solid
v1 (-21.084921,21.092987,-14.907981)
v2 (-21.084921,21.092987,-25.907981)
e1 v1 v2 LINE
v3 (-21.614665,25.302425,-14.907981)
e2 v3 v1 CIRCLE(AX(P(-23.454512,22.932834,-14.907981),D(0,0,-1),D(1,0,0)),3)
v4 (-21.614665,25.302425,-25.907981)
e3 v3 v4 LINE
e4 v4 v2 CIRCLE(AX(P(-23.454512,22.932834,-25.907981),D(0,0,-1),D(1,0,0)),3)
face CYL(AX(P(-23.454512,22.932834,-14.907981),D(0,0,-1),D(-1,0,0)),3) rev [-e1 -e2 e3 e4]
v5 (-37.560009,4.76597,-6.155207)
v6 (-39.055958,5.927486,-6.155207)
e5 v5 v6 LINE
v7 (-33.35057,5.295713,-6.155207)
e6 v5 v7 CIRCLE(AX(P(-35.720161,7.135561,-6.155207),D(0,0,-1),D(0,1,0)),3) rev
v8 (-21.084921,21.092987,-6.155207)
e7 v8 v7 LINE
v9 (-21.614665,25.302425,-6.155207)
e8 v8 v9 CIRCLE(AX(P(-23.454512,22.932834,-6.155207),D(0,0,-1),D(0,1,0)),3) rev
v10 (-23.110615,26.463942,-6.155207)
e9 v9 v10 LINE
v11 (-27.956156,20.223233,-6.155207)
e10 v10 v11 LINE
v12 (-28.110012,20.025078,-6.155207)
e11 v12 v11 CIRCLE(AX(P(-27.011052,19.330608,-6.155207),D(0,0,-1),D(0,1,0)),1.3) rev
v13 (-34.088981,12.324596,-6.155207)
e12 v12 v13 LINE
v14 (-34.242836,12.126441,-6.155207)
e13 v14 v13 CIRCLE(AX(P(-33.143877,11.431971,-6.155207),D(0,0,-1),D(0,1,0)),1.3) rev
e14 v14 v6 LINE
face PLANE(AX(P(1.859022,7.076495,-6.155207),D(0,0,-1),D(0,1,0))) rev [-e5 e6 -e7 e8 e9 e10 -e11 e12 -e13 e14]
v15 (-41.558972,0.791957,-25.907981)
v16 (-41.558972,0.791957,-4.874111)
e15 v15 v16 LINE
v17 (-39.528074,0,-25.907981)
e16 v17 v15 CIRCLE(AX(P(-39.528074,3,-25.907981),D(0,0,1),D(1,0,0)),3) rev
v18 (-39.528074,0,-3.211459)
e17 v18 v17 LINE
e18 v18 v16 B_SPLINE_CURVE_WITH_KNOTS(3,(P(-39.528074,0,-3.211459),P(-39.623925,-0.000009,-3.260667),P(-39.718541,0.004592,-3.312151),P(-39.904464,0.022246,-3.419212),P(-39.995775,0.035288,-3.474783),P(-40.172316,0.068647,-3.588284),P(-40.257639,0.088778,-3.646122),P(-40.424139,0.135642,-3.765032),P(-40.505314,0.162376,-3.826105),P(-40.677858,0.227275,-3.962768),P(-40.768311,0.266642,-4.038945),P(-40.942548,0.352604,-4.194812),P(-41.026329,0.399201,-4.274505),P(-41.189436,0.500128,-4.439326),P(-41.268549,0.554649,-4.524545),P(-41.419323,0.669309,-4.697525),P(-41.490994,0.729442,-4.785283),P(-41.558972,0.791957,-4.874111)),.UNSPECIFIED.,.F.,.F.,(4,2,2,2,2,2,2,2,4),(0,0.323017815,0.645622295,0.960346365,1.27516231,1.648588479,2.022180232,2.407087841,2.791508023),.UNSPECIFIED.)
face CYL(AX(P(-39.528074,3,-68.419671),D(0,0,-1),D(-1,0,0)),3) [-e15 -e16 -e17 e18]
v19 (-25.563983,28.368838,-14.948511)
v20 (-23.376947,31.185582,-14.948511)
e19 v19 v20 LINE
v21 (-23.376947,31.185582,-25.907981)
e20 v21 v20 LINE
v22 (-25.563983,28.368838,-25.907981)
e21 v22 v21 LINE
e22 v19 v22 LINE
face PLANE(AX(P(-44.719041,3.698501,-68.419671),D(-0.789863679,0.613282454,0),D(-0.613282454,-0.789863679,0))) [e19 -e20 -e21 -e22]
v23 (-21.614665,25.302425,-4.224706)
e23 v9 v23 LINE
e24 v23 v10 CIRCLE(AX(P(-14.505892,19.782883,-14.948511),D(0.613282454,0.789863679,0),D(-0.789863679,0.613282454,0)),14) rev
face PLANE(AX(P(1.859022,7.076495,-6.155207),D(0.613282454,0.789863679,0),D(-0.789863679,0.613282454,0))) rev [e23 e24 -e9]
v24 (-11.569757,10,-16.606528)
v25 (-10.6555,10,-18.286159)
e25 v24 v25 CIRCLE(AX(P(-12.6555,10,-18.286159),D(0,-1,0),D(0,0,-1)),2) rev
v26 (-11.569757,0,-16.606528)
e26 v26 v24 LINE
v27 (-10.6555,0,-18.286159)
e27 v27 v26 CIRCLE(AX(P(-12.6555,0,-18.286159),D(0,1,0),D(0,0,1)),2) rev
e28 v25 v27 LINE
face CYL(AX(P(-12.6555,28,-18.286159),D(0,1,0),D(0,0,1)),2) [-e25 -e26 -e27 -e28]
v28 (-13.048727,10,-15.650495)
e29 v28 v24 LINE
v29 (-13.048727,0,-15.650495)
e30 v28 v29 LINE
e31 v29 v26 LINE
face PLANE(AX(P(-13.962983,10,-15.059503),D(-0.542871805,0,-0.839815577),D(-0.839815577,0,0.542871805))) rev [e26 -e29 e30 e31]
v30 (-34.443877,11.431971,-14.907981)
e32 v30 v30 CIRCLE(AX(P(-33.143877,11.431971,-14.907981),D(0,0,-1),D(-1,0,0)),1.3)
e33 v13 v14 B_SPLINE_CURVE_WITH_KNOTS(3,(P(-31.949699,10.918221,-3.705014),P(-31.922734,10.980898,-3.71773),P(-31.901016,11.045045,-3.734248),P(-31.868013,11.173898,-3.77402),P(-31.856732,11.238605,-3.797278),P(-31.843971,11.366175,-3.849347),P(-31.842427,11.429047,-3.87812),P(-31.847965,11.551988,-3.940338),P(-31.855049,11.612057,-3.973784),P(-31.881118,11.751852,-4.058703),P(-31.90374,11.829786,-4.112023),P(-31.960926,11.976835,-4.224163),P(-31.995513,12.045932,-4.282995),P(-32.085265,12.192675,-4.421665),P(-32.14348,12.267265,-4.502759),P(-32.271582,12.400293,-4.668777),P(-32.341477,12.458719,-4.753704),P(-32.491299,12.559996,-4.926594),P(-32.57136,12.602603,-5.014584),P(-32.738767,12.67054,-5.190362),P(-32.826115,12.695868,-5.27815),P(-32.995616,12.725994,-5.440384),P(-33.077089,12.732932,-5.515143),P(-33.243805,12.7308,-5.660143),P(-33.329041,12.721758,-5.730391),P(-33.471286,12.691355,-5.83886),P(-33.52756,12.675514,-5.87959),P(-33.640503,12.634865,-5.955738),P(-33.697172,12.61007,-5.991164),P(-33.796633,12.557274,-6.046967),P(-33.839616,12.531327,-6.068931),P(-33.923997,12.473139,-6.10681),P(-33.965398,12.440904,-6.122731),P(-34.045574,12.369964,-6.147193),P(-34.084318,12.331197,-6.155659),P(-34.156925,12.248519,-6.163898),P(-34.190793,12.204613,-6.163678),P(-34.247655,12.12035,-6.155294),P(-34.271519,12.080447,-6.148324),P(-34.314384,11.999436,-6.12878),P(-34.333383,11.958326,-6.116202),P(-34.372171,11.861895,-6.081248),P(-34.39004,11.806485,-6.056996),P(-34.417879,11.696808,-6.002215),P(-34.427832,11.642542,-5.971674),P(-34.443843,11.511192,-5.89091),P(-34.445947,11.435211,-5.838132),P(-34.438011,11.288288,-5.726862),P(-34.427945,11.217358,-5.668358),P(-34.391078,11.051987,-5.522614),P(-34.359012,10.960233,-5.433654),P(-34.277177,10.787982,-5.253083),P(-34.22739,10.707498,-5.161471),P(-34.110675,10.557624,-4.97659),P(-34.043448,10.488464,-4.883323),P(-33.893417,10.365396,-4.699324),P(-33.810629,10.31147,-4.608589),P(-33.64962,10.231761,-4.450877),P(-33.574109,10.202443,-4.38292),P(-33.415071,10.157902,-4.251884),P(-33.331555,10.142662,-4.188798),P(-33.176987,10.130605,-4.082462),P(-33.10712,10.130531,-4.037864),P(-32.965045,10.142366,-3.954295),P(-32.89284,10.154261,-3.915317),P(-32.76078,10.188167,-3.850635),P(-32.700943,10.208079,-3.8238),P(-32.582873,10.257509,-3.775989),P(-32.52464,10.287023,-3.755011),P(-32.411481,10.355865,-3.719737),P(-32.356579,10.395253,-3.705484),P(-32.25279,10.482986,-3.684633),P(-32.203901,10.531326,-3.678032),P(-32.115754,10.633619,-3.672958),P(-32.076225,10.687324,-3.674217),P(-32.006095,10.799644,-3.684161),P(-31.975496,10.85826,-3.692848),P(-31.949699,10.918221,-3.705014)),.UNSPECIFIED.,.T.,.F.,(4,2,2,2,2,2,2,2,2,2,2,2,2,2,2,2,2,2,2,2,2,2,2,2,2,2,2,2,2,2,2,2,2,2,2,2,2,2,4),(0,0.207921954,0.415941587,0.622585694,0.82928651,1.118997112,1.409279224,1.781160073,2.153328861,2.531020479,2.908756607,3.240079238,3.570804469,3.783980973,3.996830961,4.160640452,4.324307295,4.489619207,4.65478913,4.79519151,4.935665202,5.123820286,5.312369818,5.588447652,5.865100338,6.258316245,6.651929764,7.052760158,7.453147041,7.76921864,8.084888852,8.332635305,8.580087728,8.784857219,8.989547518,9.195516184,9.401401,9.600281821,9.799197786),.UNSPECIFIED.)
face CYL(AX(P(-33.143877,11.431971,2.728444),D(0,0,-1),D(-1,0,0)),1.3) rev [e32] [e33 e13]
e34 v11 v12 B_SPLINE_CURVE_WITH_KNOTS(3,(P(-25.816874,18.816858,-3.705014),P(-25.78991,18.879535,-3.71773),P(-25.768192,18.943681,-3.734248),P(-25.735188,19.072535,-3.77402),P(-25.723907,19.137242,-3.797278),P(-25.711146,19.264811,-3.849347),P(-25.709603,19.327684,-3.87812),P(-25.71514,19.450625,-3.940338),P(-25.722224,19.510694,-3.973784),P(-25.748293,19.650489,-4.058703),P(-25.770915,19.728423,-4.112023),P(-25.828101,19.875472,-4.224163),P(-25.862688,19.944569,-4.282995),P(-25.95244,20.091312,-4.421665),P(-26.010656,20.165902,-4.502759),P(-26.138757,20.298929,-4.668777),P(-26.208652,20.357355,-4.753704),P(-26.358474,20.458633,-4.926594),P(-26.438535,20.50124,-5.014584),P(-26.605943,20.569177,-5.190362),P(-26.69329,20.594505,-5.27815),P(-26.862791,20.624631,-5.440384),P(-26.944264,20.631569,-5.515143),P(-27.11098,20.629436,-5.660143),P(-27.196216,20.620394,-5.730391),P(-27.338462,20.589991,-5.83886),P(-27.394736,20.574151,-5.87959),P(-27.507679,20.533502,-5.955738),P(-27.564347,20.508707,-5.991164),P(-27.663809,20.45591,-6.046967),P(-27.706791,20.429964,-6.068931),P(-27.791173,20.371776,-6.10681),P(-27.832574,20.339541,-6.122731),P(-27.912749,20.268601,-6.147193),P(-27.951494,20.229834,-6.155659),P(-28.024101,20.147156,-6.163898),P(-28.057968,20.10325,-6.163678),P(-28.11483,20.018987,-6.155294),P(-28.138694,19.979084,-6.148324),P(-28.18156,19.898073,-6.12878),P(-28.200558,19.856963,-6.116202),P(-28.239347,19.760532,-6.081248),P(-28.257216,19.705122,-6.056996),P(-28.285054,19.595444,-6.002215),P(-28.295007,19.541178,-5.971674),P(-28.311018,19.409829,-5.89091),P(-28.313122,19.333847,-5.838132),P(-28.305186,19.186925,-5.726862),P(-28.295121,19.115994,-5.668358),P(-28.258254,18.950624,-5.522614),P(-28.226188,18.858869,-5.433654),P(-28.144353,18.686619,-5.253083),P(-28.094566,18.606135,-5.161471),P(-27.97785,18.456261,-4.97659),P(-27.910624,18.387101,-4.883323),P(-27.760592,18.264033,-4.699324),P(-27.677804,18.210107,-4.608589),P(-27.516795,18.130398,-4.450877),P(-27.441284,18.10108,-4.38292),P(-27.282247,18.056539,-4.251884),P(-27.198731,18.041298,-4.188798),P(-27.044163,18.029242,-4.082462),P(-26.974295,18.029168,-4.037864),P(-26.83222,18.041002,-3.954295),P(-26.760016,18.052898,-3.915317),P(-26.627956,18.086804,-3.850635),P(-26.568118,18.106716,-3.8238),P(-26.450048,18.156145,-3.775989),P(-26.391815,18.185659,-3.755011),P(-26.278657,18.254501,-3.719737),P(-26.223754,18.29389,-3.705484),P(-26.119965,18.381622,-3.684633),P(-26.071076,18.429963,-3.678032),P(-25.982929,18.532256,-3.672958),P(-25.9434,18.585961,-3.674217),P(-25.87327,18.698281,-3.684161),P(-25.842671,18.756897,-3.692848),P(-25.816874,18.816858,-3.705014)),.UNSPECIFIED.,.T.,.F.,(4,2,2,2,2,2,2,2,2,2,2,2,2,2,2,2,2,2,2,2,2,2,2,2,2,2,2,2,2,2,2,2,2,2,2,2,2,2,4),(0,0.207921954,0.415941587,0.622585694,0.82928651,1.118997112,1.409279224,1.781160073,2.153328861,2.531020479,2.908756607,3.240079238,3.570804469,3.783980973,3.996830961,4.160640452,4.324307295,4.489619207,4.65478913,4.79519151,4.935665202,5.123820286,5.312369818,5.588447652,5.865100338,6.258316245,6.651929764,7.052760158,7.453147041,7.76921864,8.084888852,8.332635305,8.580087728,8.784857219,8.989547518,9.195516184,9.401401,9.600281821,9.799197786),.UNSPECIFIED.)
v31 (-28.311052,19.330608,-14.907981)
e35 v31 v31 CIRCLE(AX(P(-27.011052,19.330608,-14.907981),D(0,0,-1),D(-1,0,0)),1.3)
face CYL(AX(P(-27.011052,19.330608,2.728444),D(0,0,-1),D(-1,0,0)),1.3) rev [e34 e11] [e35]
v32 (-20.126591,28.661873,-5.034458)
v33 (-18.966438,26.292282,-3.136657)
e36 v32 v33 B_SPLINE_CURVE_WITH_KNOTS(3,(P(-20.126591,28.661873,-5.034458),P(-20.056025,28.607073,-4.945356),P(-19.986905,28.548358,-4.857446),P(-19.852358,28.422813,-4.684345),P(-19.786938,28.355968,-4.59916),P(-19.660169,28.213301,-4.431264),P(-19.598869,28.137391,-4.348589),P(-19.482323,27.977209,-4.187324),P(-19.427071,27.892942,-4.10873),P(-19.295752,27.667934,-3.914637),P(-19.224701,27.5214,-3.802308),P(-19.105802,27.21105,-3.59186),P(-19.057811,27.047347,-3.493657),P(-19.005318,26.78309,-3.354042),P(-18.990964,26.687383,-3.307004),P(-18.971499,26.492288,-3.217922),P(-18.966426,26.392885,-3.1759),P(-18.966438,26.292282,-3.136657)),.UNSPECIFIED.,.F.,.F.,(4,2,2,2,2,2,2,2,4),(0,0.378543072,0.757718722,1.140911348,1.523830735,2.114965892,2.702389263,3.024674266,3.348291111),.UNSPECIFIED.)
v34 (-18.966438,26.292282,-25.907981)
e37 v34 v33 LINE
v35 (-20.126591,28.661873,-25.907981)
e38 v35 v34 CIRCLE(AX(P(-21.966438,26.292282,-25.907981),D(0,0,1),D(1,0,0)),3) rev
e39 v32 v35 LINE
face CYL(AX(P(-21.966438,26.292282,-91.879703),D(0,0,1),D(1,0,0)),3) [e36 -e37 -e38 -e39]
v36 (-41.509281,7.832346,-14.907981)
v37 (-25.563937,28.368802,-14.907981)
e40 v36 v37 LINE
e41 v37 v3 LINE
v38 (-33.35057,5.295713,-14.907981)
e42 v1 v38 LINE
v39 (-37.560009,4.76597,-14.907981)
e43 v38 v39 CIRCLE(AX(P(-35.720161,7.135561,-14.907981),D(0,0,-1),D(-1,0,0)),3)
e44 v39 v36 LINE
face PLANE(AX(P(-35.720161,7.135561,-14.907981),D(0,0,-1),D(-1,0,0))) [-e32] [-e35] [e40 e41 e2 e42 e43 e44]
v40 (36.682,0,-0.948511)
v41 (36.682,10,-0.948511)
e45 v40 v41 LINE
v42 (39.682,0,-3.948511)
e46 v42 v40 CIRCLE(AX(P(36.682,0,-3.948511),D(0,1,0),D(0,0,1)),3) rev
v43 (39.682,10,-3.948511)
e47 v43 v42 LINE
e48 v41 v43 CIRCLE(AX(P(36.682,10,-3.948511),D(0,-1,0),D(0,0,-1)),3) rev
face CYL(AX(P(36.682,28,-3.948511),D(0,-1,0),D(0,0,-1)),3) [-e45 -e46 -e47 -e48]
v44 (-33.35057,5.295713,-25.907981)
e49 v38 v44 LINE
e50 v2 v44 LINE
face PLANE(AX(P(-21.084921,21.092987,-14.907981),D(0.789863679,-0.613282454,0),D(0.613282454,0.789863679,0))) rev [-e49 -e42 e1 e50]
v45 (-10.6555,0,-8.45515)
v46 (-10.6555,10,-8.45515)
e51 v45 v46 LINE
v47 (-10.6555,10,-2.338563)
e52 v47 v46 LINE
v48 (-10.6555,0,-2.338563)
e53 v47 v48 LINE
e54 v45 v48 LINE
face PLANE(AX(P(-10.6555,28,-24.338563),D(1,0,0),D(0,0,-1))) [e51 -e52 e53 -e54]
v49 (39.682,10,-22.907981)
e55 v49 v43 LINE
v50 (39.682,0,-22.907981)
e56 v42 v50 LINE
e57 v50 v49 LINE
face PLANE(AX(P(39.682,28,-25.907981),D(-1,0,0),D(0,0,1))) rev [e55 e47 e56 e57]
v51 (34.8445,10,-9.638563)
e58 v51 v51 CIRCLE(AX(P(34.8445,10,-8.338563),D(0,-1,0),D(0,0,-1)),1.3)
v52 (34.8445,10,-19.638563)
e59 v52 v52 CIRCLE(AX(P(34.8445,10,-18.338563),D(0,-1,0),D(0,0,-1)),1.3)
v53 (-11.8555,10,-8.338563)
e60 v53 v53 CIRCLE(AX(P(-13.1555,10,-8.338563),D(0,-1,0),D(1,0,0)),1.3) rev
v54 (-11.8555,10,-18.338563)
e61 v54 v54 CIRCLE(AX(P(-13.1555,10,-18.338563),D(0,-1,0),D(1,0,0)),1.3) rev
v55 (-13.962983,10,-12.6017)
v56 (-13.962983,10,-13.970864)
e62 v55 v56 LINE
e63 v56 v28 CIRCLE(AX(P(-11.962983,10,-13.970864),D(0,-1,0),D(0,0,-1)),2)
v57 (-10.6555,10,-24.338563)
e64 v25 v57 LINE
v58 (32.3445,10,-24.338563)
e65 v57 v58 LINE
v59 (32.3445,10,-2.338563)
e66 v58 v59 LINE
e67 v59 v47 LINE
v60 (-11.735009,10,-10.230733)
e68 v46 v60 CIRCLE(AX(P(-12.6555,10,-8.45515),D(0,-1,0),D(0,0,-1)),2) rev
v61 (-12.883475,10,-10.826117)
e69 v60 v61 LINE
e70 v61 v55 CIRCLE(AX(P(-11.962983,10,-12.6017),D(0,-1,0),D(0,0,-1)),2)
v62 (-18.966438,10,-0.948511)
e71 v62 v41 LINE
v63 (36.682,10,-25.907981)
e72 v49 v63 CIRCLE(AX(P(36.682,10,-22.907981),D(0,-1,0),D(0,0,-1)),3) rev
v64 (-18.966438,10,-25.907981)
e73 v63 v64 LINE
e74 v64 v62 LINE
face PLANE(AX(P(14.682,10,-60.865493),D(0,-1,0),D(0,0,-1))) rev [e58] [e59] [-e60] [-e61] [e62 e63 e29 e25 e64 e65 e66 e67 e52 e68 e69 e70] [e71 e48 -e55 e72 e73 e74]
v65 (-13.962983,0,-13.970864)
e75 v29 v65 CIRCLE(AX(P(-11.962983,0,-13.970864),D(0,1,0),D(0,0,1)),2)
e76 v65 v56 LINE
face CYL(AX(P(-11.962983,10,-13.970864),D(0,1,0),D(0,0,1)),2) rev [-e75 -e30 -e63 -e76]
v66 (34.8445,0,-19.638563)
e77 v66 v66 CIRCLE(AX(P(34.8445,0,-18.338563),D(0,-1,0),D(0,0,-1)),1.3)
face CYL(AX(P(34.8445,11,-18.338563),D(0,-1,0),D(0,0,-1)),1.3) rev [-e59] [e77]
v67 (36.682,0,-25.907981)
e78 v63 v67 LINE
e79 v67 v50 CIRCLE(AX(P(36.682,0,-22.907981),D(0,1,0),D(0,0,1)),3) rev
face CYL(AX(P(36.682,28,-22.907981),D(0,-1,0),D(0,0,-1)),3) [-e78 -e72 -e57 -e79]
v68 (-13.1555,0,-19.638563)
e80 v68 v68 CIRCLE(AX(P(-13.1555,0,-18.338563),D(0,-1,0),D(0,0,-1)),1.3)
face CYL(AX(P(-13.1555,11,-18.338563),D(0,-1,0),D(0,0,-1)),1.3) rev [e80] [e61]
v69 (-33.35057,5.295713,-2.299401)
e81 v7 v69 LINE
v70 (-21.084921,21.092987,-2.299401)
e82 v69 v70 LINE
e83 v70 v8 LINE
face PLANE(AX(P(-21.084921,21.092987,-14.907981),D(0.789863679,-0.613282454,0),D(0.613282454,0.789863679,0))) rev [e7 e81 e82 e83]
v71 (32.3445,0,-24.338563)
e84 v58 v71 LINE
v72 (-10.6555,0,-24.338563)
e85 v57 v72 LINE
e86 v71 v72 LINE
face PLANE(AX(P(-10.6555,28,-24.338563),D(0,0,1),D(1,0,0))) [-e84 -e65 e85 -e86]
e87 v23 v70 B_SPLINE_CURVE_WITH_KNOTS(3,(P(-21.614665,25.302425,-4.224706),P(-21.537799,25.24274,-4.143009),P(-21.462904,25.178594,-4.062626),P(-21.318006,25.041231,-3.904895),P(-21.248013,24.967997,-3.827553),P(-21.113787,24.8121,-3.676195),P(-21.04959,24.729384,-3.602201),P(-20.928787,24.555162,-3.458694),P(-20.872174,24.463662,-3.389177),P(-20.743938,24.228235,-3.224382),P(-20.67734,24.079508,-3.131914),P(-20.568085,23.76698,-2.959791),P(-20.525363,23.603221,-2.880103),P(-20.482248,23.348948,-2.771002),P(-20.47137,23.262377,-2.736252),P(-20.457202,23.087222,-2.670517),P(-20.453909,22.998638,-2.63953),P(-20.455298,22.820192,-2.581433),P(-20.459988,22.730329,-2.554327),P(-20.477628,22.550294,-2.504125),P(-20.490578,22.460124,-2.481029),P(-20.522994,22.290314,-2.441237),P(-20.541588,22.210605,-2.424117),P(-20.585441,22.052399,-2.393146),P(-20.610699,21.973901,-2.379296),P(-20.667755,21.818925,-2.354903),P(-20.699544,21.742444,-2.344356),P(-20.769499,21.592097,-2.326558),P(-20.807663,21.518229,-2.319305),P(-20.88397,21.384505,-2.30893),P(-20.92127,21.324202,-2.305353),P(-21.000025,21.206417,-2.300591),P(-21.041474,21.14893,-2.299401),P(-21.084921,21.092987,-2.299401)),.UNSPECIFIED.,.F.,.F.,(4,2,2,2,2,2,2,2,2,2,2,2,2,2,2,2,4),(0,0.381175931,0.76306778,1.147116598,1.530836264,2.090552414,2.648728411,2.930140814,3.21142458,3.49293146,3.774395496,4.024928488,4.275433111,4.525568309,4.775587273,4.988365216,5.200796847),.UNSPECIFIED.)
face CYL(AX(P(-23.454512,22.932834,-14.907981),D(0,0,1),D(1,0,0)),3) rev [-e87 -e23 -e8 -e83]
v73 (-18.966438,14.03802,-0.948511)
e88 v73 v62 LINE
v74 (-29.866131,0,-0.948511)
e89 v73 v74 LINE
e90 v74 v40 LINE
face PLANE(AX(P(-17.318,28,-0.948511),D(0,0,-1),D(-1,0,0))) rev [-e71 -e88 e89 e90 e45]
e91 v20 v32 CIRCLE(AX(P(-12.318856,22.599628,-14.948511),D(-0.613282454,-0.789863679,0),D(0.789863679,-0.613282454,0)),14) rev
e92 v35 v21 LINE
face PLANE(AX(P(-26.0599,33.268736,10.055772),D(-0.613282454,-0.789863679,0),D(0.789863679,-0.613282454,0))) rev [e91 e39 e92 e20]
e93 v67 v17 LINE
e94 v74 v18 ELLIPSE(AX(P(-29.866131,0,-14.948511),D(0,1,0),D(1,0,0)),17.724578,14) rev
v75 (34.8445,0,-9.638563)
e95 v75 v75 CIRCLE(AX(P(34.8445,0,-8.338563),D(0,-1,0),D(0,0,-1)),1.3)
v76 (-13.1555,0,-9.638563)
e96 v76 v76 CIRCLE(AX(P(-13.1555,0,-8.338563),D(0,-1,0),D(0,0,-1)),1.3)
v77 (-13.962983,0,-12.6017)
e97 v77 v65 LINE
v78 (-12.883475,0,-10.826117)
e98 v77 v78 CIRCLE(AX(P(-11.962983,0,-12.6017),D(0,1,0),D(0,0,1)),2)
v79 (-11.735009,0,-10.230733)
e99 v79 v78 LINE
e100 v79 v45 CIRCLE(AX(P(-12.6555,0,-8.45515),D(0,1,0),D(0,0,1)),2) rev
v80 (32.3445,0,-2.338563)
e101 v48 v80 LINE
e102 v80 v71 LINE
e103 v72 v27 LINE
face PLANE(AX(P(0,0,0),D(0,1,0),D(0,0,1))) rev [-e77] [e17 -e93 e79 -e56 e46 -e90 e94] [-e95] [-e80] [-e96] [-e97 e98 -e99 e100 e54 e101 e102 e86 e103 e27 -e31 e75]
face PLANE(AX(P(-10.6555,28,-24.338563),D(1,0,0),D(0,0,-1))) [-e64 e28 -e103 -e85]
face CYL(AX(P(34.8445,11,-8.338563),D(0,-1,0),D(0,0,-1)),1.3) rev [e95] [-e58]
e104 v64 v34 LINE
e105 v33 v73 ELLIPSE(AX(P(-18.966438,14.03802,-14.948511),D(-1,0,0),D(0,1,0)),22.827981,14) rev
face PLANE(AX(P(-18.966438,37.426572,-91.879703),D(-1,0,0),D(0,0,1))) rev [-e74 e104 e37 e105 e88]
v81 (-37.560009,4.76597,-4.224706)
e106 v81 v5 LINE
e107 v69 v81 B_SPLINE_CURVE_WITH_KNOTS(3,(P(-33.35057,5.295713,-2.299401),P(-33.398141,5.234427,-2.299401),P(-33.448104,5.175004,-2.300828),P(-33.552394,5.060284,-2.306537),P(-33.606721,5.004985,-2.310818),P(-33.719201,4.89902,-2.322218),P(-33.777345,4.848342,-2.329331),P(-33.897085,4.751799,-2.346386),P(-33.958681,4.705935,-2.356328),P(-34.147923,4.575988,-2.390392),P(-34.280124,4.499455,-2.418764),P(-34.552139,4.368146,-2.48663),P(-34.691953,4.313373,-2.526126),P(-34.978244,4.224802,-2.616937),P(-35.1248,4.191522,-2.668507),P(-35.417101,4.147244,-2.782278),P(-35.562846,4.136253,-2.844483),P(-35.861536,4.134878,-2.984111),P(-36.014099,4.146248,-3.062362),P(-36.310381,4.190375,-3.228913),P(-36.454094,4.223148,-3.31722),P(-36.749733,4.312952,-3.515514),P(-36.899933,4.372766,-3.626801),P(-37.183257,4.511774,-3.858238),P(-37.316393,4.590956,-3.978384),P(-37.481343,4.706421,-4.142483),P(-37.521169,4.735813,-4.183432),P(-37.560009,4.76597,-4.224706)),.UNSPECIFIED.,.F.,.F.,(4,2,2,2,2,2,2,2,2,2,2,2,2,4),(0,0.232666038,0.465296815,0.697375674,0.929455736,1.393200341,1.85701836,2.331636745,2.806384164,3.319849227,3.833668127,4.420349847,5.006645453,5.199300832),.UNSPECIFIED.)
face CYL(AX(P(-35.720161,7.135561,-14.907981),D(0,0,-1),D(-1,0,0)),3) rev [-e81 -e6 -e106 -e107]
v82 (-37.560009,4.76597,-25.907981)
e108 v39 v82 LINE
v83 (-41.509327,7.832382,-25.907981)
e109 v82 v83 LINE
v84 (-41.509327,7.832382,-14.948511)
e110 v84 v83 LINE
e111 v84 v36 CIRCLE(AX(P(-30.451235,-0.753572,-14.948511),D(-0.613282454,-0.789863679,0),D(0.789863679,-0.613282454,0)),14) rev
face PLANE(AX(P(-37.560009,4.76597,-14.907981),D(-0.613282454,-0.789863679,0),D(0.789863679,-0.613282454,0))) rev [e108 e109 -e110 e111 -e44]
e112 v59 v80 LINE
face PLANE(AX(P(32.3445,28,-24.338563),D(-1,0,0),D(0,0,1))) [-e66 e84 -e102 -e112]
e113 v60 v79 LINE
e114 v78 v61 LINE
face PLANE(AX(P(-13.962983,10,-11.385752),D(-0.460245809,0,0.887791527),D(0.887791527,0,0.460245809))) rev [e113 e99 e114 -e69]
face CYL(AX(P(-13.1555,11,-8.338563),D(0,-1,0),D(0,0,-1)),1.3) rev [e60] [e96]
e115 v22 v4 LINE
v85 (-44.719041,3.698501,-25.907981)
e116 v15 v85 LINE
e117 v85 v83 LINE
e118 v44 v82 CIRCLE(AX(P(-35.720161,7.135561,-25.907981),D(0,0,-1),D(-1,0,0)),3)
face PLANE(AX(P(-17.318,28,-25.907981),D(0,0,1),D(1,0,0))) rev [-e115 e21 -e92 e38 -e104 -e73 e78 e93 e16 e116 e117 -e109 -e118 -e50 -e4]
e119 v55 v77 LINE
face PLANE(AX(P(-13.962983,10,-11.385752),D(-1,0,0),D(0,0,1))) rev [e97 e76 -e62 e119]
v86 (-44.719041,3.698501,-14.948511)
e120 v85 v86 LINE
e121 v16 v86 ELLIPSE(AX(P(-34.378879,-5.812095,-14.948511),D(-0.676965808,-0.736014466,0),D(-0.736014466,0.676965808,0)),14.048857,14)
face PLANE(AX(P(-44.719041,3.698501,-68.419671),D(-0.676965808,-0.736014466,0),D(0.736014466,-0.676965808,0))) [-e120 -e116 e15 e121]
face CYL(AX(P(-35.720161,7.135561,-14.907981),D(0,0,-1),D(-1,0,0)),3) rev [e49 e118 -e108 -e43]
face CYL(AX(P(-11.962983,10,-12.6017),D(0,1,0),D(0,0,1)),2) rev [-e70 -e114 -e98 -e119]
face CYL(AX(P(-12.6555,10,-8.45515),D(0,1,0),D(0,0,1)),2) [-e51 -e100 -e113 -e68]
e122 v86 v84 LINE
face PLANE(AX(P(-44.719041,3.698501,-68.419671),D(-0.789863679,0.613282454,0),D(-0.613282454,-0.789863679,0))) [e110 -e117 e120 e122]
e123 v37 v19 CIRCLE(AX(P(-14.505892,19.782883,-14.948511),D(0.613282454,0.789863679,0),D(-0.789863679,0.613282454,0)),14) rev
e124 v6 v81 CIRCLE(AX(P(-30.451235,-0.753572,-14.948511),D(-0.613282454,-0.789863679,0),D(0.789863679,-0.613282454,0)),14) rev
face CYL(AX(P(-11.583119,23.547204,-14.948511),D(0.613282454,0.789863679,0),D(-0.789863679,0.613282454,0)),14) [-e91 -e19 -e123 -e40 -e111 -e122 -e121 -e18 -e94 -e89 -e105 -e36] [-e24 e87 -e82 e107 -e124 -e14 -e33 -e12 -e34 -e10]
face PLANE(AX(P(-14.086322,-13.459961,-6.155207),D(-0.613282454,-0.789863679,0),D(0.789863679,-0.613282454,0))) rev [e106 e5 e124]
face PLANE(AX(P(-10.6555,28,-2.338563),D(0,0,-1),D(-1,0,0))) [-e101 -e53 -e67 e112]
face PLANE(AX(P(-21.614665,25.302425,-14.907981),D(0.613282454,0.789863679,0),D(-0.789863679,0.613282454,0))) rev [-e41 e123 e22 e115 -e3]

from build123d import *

# Parameters (mm, degrees)
CROQUIS1_W                        = 57
CROQUIS1_H                        = 24.959470006
CROQUIS1_W_2                      = 43
CROQUIS1_H_2                      = 22
MAIN_DEPTH                        = 28
CORTE_CAJA_REACH                  = 56.604
CROQUIS2_W                        = 27.955905163
CROQUIS2_H                        = 20.987971864
CROQUIS3_W                        = 32
CROQUIS3_H                        = 24.959470006
SALIENTE_EXTRUIR2_DEPTH           = 2.25
REDONDEO_LATERALES_R              = 3
CROQUIS7_R                        = 1.3
TALADROS_BASE_DEPTH               = 11
CAJEADO_CABLE_DEPTH               = 10
CAJEADO_REDONDEO_R                = 2
SOPORTE_EN_ANGULO_DEPTH           = 24.959470007
CAJA_PARA_SOPORTE_DEPTH           = 11
CROQUIS12_R                       = 1.3
TALADROS_CAJA_SOPORTE_DEPTH       = 13.959470007
CROQUIS15_W                       = 60.00042655
CROQUIS15_H                       = 27.426571923
RECORTE_CAJA_DEPTH                = 24.959470007
CHAFLAN_SUPERIOR_SOPORTE_DEPTH    = 24.959470007
REDONDEO_ARISTAS_SOPORTE_R        = 3
REDONDEO_SOPORTE_R                = 14
CROQUIS17_W                       = 6.155207263
CROQUIS17_H                       = 26
CAJA_TORNILLOS_SOPORTE_DEPTH      = 8
REDONDEO_CAJA_TORNILLOS_SOPORTE_R = 3


with BuildPart() as part:
    # Croquis1 → Main (new body)
    with BuildSketch(Plane(origin=(0, 0, 0), x_dir=(1, 0, 0), z_dir=(0, 1, 0))):
        with Locations((11.181999645, 13.428246359)):
            Rectangle(CROQUIS1_W, CROQUIS1_H)
        with Locations((10.844499645, 13.338562849)):
            Rectangle(CROQUIS1_W_2, CROQUIS1_H_2, mode=Mode.SUBTRACT)
    extrude(amount=MAIN_DEPTH)

    # Corte Caja: up to this face of the body (flat: up to its plane)
    corte_caja_end = Plane(part.part.faces().sort_by_distance((11.181999645, 14, -25.907981362))[0])
    # Croquis2 → Corte Caja (cut, up to the picked face)
    with BuildSketch(Plane.XY.offset(-0.948511356), mode=Mode.PRIVATE) as corte_caja_sk1:
        with Locations((28.659952227, 20.493985932)):
            Rectangle(CROQUIS2_W, CROQUIS2_H)
    corte_caja_tool1 = split(extrude(corte_caja_sk1.sketch, amount=-CORTE_CAJA_REACH, mode=Mode.PRIVATE), bisect_by=corte_caja_end, keep=Keep.BOTH, mode=Mode.PRIVATE)
    add(corte_caja_tool1.solids().sort_by(Axis((28.659952, 20.493986, -0.948511), (0, 0, -1)))[0], mode=Mode.SUBTRACT)

    # Croquis3 → Saliente-Extruir2 (add)
    with BuildSketch(Plane(origin=(0, 28, 0), x_dir=(1, 0, 0), z_dir=(0, 1, 0))):
        with Locations((-1.318000355, 13.428246359)):
            Rectangle(CROQUIS3_W, CROQUIS3_H)
    extrude(amount=SALIENTE_EXTRUIR2_DEPTH)

    # Redondeo Laterales
    redondeo_laterales_edges = [part.edges().sort_by_distance(p)[0] for p in [
        (39.681999645, 5, -25.907981362),
        (39.681999645, 5, -0.948511356),
    ]]
    fillet(redondeo_laterales_edges, radius=REDONDEO_LATERALES_R)

    # Croquis7 → Taladros Base (cut)
    with BuildSketch(Plane.XZ):
        with Locations(Location((-13.155500355, -8.338562849, 0), (0, 0, 270))):
            Circle(CROQUIS7_R)
        with Locations(Location((-13.155500355, -18.338562849, 0), (0, 0, 270))):
            Circle(CROQUIS7_R)
        with Locations(Location((34.844499645, -8.338562849, 0), (0, 0, 270))):
            Circle(CROQUIS7_R)
        with Locations(Location((34.844499645, -18.338562849, 0), (0, 0, 270))):
            Circle(CROQUIS7_R)
    extrude(amount=-TALADROS_BASE_DEPTH, mode=Mode.SUBTRACT)

    # Croquis8 → Cajeado cable (cut)
    with BuildSketch(Plane.XZ):
        Polygon((-10.655500355, -17.197519433), (-10.655500355, -9.671098091), (-13.962983419, -11.385752006), (-13.962983419, -15.059503242), align=None)
    extrude(amount=-CAJEADO_CABLE_DEPTH, mode=Mode.SUBTRACT)

    # Cajeado Redondeo
    cajeado_redondeo_edges = [part.edges().sort_by_distance(p)[0] for p in [
        (-13.962983419, 5, -11.385752006),
        (-10.655500355, 5, -9.671098091),
        (-10.655500355, 5, -17.197519433),
        (-13.962983419, 5, -15.059503242),
    ]]
    fillet(cajeado_redondeo_edges, radius=CAJEADO_REDONDEO_R)

    # Croquis10 → Soporte en angulo (add)
    with BuildSketch(Plane.XY.offset(-0.948511356)):
        Polygon((-17.318000355, 30.25), (-17.318000355, 0), (-40.697936457, 0), (-44.719041018, 3.698501078), (-22.354269001, 32.502718411), (-18.018493057, 32.502718411), align=None)
    extrude(amount=-SOPORTE_EN_ANGULO_DEPTH)

    # Croquis11 → Caja para soporte (cut)
    with BuildSketch(Plane(origin=(0, 0, -25.907981362), x_dir=(-1, 0, 0), z_dir=(0, 0, -1))):
        with BuildLine():
            Line((41.509326916, 7.83238192), (25.563983103, 28.36883757))
            Line((25.563983103, 28.36883757), (21.614664709, 25.302425298))
            ThreePointArc((21.614664709, 25.302425298), (20.477989634, 23.307419605), (21.084921035, 21.092986898))
            Line((21.084921035, 21.092986898), (33.350570122, 5.295713321))
            ThreePointArc((33.350570122, 5.295713321), (35.345575815, 4.159038247), (37.560008522, 4.765969648))
            Line((37.560008522, 4.765969648), (41.509326916, 7.83238192))
        make_face()
    extrude(amount=-CAJA_PARA_SOPORTE_DEPTH, mode=Mode.SUBTRACT)

    # Croquis12 → Taladros caja soporte (cut)
    with BuildSketch(Plane(origin=(0, 0, -14.907981362), x_dir=(-1, 0, 0), z_dir=(0, 0, -1))):
        with Locations((27.011052418, 19.330608197)):
            Circle(CROQUIS12_R)
        with Locations((33.143876962, 11.431971409)):
            Circle(CROQUIS12_R)
    extrude(amount=-TALADROS_CAJA_SOPORTE_DEPTH, mode=Mode.SUBTRACT)

    # Croquis15 → Recorte Caja (cut)
    with BuildSketch(Plane.XY.offset(-0.948511356)):
        with Locations((11.033774869, 23.713285962)):
            Rectangle(CROQUIS15_W, CROQUIS15_H)
    extrude(amount=-RECORTE_CAJA_DEPTH, mode=Mode.SUBTRACT)

    # Croquis16 → Chaflan superior soporte (cut)
    with BuildSketch(Plane(origin=(0, 0, -25.907981362), x_dir=(-1, 0, 0), z_dir=(0, 0, -1))):
        Polygon((26.059899943, 33.268736427), (17.368016439, 26.520002701), (17.368016439, 33.268736427), align=None)
    extrude(amount=-CHAFLAN_SUPERIOR_SOPORTE_DEPTH, mode=Mode.SUBTRACT)

    # Redondeo aristas soporte
    redondeo_aristas_soporte_edges = [part.edges().sort_by_distance(p)[0] for p in [
        (-40.697936457, 0, -13.428246359),
        (-18.966438406, 27.761082869, -13.428246359),
    ]]
    fillet(redondeo_aristas_soporte_edges, radius=REDONDEO_ARISTAS_SOPORTE_R)

    # Redondeo soporte
    # the kernel refuses this fillet: 14 mm, written as the material it takes off along each edge
    with BuildSketch(Plane(origin=(-66.183926921, -23.946727682, -0.948511356), x_dir=(0.7898636788540391, -0.6132824543610909, 0), z_dir=(0.6132824543610909, 0.7898636788540392, 0))) as redondeo_soporte_piece_1:
        with BuildLine():
            CenterArc((REDONDEO_SOPORTE_R, REDONDEO_SOPORTE_R), REDONDEO_SOPORTE_R, 180, 90)
            Line((0, REDONDEO_SOPORTE_R), (0, 0))
            Line((0, 0), (REDONDEO_SOPORTE_R, 0))
        make_face()
    extrude(amount=104.799778712, mode=Mode.SUBTRACT)

    # Croquis17 → Caja tornillos soporte (cut)
    with BuildSketch(Plane(origin=(-29.691111601, 23.053392988, 0), x_dir=(0, 0, 1), z_dir=(-0.789863678854039, 0.6132824543610911, 0))):
        with Locations((-3.077603632, -6.270427893)):
            Rectangle(CROQUIS17_W, CROQUIS17_H)
    extrude(amount=-CAJA_TORNILLOS_SOPORTE_DEPTH, mode=Mode.SUBTRACT)

    # redondeo Caja tornillos soporte
    redondeo_caja_tornillos_soporte_edges = [part.edges().sort_by_distance(p)[0] for p in [
        (-35.190417485, 2.926122285, -4.227303989),
        (-19.245073672, 23.462577935, -4.227303989),
    ]]
    fillet(redondeo_caja_tornillos_soporte_edges, radius=REDONDEO_CAJA_TORNILLOS_SOPORTE_R)


solid = part.part
